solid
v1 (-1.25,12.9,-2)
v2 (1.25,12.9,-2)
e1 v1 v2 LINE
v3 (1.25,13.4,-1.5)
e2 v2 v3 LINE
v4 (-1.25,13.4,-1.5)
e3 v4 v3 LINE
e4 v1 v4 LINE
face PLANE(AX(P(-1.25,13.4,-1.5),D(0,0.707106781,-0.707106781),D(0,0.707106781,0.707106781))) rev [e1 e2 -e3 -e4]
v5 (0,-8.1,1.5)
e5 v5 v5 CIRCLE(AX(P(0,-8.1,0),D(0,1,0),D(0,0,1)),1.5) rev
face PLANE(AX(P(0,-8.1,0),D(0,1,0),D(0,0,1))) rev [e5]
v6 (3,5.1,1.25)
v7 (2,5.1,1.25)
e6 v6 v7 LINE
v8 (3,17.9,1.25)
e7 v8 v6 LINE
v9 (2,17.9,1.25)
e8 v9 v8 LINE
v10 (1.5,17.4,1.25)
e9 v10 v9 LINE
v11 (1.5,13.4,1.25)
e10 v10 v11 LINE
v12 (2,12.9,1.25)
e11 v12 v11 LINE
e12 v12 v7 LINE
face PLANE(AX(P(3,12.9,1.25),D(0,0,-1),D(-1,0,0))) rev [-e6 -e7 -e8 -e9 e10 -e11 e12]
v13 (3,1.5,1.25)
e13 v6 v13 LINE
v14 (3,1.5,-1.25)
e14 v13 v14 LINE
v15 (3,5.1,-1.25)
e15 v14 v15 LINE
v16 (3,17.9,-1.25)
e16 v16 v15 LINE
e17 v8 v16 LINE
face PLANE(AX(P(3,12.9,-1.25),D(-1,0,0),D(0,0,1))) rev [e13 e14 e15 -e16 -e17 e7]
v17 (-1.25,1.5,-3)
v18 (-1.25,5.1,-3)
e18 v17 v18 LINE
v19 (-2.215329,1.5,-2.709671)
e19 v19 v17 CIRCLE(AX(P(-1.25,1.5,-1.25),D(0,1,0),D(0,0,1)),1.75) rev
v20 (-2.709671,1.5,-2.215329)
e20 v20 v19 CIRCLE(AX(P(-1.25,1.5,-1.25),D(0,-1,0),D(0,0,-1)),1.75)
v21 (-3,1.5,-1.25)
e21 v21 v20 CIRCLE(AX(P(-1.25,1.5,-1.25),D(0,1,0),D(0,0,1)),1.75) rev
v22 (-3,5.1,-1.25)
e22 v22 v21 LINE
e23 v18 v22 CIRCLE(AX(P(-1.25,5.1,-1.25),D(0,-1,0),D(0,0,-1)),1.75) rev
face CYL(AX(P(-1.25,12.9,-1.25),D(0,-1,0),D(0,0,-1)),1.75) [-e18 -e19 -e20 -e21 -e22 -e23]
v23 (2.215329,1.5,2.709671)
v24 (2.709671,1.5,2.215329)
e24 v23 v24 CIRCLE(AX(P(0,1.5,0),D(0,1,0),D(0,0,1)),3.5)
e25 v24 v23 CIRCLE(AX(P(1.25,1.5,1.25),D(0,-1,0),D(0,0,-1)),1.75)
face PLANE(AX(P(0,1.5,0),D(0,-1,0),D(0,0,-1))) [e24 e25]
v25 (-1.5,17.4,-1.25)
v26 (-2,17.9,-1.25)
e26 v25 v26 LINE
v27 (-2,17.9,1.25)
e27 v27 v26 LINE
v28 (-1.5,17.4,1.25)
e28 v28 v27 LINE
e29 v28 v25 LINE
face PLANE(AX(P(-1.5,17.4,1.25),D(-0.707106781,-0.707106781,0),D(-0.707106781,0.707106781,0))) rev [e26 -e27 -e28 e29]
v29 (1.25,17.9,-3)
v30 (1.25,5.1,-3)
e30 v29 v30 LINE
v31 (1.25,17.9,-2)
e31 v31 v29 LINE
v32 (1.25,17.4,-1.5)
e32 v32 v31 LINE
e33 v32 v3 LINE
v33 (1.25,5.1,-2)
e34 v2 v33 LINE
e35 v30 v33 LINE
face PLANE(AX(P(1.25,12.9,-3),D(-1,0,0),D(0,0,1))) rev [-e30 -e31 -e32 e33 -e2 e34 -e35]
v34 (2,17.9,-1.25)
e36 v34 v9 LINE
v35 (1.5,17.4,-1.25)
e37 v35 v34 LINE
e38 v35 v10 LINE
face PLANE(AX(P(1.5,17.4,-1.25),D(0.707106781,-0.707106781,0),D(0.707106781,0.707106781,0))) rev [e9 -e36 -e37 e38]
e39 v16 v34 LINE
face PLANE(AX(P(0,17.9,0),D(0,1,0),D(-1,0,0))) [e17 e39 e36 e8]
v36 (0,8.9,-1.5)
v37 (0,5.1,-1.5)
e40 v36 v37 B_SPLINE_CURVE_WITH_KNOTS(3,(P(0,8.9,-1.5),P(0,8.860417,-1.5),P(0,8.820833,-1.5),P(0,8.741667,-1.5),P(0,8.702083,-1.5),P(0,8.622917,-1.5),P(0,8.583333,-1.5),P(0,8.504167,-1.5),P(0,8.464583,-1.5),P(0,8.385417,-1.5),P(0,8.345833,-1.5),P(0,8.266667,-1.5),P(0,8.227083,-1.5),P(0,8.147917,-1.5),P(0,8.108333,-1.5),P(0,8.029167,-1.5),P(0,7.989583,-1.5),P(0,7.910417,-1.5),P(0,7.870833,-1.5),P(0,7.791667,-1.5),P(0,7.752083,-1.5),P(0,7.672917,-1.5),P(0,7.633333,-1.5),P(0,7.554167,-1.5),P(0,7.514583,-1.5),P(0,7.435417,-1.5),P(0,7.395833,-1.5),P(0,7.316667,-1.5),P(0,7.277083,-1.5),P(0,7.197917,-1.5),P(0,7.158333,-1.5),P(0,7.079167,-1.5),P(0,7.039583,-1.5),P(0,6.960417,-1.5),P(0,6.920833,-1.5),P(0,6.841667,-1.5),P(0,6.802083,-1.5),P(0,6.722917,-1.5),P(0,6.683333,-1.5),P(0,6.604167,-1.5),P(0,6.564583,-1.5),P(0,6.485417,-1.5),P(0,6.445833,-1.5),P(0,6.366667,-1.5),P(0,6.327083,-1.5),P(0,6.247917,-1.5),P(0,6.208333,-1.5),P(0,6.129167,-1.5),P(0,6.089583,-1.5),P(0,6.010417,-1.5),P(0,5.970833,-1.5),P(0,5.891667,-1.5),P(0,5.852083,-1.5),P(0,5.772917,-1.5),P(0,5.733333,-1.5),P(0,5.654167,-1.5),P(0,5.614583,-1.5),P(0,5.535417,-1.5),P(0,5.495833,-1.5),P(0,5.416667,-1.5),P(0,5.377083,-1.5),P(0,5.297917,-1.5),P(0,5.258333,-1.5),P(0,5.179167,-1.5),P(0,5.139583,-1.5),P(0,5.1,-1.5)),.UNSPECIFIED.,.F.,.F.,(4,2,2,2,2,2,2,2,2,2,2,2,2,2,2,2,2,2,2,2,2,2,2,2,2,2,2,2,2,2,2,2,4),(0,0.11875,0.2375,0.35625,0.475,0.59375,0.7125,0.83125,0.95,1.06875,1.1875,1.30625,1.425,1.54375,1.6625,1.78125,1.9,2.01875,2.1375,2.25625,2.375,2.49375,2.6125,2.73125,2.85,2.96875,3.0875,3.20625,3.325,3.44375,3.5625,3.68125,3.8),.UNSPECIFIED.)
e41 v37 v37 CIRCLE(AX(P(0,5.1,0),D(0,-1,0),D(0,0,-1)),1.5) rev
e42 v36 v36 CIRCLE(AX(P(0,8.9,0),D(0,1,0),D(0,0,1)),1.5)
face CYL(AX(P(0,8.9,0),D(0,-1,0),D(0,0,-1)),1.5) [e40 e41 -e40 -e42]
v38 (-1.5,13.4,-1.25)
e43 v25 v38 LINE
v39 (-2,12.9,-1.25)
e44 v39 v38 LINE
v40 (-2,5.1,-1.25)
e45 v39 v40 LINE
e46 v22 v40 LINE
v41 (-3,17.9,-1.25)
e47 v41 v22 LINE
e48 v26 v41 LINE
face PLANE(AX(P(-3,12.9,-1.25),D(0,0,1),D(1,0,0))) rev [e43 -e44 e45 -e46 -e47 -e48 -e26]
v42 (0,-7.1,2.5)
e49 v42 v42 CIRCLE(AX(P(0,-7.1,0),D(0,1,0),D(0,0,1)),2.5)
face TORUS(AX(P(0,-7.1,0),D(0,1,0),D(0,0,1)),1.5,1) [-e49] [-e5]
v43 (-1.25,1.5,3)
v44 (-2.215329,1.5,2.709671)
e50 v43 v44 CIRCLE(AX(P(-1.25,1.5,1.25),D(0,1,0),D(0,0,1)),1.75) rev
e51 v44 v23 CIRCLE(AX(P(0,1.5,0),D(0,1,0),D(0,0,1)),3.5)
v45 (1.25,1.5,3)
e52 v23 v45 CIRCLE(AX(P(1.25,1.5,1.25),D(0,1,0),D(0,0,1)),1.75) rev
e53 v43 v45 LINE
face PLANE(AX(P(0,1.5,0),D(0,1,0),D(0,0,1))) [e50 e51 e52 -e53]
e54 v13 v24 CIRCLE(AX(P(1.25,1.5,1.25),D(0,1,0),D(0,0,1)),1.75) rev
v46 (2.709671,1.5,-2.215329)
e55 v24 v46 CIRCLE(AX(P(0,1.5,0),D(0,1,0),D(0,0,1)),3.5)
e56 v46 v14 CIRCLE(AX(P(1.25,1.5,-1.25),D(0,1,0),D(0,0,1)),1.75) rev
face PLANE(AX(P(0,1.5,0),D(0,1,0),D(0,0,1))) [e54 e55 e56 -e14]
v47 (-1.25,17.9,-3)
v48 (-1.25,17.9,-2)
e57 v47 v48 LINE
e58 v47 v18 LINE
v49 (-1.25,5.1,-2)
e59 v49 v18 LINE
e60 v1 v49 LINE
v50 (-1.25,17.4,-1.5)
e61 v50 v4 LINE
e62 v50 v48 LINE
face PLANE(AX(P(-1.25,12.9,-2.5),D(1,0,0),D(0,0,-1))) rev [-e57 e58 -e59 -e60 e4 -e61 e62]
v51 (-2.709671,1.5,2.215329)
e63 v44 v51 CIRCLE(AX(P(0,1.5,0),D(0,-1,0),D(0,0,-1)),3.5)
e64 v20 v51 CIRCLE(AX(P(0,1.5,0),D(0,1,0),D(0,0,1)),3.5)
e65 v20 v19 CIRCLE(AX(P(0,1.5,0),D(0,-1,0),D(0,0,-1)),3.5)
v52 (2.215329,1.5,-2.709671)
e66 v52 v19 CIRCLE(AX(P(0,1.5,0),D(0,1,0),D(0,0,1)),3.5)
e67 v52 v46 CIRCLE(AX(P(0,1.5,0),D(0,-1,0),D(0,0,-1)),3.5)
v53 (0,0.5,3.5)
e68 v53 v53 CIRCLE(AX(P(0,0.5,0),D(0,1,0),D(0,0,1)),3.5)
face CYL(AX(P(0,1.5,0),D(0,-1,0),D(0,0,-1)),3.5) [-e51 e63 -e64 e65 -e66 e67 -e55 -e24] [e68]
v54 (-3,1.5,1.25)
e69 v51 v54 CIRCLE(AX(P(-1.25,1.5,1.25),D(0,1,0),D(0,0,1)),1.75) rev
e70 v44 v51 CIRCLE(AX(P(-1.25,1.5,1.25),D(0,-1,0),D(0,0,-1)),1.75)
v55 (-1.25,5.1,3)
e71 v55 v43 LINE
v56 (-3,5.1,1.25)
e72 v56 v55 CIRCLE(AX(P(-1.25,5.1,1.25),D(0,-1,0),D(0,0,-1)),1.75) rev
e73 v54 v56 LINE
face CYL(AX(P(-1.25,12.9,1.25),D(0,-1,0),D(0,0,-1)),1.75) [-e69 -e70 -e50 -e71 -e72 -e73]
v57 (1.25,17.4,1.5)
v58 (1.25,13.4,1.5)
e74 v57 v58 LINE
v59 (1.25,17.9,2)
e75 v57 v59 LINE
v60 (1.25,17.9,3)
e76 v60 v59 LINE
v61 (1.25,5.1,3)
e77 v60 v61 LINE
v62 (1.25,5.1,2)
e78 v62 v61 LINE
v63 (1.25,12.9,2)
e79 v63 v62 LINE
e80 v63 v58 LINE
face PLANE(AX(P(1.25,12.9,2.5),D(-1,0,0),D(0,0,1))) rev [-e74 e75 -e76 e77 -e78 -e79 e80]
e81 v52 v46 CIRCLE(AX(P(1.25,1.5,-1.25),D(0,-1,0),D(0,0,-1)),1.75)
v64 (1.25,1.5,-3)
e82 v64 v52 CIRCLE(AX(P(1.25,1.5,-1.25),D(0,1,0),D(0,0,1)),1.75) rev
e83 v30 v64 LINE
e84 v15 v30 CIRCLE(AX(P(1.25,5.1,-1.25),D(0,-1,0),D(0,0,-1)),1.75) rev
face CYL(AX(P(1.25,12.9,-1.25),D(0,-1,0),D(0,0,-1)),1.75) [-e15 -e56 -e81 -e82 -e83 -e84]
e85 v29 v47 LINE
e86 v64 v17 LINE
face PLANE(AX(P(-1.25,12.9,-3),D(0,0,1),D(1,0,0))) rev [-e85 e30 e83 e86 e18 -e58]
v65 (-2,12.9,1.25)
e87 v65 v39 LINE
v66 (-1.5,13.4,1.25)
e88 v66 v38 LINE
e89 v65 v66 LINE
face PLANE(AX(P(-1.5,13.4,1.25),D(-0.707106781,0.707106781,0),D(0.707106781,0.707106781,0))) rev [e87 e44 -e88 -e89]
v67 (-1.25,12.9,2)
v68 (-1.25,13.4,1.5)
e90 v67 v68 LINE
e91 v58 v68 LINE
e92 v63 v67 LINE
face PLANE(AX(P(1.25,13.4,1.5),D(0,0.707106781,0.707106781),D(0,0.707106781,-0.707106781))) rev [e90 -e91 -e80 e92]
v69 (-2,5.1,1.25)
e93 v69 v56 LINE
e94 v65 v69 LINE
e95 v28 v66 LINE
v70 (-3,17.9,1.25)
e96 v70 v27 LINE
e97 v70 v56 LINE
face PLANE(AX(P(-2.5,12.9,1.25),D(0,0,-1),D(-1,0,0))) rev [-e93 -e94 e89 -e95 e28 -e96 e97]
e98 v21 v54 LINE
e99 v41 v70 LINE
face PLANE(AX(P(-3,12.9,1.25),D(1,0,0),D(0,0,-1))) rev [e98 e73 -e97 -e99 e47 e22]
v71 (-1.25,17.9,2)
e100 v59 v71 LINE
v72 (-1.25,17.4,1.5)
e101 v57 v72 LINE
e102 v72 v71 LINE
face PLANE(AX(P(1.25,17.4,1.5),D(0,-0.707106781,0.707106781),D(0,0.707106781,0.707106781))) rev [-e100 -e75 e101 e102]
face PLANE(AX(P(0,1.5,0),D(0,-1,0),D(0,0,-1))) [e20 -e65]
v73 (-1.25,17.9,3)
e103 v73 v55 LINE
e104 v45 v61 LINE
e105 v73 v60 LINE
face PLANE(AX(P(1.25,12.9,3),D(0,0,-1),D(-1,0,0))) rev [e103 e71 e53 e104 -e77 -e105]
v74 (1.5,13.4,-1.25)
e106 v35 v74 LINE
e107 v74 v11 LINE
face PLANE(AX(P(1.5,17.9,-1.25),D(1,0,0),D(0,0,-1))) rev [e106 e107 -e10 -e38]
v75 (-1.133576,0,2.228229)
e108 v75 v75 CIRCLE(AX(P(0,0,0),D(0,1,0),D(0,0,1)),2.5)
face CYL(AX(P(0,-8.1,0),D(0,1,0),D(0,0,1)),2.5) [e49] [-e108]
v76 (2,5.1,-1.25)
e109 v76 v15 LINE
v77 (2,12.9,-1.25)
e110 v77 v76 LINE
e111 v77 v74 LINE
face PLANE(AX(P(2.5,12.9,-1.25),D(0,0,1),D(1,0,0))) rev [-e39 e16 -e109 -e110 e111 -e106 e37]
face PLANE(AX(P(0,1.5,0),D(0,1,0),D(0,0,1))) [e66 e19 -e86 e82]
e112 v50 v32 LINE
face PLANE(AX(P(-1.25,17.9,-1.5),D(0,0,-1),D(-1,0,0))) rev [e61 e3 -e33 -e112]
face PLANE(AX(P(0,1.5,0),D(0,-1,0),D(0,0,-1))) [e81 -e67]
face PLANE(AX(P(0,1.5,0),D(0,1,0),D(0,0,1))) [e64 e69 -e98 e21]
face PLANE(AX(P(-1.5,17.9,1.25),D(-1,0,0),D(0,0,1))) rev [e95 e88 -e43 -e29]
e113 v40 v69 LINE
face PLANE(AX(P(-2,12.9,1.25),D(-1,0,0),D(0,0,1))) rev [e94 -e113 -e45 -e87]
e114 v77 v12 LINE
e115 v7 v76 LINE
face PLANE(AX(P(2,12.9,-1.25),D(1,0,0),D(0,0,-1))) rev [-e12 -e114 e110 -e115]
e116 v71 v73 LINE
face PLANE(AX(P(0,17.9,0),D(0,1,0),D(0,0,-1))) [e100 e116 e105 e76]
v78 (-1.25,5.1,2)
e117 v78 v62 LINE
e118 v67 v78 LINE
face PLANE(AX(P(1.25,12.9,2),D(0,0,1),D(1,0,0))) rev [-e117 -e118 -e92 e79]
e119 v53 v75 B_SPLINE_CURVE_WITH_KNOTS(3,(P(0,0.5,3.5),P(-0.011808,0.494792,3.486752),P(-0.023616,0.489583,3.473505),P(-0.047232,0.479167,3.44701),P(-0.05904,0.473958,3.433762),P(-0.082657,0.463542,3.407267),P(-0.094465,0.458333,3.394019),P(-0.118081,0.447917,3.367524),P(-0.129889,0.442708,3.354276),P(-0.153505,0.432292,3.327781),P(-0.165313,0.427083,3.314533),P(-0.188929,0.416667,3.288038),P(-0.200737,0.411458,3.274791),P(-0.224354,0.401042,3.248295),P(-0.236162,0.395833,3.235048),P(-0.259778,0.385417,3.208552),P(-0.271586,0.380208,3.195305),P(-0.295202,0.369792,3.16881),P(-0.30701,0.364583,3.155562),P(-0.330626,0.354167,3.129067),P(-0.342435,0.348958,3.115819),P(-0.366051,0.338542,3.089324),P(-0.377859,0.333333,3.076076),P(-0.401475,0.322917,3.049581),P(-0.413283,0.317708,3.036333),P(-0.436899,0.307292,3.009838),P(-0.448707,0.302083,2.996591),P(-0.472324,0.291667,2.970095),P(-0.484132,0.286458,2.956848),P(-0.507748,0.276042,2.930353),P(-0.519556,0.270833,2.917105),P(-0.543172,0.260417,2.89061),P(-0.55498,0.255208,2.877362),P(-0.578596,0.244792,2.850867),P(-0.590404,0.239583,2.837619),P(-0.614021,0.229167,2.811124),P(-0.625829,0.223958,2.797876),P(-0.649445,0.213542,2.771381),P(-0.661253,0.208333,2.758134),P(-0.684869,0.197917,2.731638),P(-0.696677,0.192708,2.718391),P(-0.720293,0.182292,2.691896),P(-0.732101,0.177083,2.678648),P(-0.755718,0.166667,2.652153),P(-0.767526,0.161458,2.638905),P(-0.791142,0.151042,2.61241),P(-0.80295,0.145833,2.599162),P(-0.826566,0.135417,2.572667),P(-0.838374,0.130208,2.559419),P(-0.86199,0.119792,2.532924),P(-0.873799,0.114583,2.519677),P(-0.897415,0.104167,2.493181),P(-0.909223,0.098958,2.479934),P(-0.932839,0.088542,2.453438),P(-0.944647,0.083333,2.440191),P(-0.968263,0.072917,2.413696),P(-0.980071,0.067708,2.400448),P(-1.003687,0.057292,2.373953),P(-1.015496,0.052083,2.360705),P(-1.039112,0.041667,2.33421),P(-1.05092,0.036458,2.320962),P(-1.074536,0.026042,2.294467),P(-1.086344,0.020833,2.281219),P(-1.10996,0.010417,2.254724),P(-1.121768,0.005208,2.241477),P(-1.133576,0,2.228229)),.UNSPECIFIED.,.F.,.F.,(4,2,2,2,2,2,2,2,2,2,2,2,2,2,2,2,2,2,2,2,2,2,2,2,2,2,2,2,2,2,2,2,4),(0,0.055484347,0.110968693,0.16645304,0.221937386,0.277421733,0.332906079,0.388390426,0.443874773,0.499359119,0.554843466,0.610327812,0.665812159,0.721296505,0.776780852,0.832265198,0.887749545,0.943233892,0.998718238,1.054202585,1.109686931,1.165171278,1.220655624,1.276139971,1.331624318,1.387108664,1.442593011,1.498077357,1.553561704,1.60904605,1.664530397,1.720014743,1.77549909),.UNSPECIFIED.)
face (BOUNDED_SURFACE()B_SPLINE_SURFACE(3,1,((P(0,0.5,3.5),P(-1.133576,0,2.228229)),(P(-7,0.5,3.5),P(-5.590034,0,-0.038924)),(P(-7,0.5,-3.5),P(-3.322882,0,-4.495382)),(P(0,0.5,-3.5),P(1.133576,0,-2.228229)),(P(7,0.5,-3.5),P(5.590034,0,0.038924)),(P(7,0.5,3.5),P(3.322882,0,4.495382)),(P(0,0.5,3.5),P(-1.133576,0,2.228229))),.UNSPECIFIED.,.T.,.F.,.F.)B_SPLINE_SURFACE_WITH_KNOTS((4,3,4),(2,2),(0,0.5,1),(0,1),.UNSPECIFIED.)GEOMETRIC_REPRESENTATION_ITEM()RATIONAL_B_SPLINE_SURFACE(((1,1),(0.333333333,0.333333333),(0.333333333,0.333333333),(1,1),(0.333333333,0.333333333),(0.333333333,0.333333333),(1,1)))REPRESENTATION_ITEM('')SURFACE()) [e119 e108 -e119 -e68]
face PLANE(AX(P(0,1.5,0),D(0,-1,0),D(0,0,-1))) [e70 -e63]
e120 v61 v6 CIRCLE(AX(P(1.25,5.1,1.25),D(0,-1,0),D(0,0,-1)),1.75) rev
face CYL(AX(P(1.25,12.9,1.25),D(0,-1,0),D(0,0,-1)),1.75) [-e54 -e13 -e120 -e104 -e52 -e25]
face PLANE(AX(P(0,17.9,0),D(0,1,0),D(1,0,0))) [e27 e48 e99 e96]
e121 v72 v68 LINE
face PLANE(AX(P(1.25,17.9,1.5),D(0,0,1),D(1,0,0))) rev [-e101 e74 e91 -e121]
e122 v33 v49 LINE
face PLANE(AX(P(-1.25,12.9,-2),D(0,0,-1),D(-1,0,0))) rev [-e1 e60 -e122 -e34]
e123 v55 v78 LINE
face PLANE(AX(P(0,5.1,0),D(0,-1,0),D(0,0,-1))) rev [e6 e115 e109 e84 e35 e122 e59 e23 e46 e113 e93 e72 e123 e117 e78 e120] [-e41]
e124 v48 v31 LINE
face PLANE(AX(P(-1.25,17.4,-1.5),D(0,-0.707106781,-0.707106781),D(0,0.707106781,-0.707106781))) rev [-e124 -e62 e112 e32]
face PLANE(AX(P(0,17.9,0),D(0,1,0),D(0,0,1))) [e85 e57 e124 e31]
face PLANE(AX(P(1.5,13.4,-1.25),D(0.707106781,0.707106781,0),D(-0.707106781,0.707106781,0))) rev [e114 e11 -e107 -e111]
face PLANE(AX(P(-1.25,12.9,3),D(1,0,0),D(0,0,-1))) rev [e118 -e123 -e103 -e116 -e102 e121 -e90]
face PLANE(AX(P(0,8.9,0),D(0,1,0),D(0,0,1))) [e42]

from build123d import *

# Parameters (mm, degrees)
SKETCH_1_R               = 2.5
EXTRUDE_1_DEPTH          = 8.1
SKETCH_4_R               = 3.5
EXTRUDE_2_DEPTH          = 1
EXTRUDE_3_DEPTH          = 11.4
SKETCH_6_W               = 2.5
SKETCH_6_H               = 1.5
EXTRUDE_4_DEPTH          = 5
CUT_EXTRUDE_2_DEPTH      = 2.5
CUT_EXTRUDE_3_DEPTH      = 2.5
PATTERN_CIRCULAR_4_COUNT = 4
EXTRUDE_6_DEPTH          = 3.6
SKETCH_15_R              = 1.5
EXTRUDE_7_DEPTH          = 3.8
FILLET_2_R               = 1
FILLET_3_R               = 1.75


with BuildPart() as part:
    # Эскиз1 → Бобышка-Вытянуть1 (new body)
    with BuildSketch(Plane(origin=(0, 0, 0), x_dir=(1, 0, 0), z_dir=(0, 1, 0))):
        with Locations(Location((0, 0, 0), (0, 0, 270))):
            Circle(SKETCH_1_R)
    extrude(amount=-EXTRUDE_1_DEPTH)

    # По сечениям1: read off the stored shape, not the designer's step
    # По сечениям1: loft between two sections, ruled curve by curve
    loft_1_from = [
        Edge.make_bspline([(0, 0.5, 3.5), (-7, 0.5, 3.5), (-7, 0.5, -3.5), (0, 0.5, -3.5), (7, 0.5, -3.5), (7, 0.5, 3.5), (0, 0.5, 3.5)], [0, 0, 0, 0, 0.5, 0.5, 0.5, 1, 1, 1, 1], 3, [1, 0.333333333, 0.333333333, 1, 0.333333333, 0.333333333, 1]),
    ]
    loft_1_to = [
        Edge.make_bspline([(-1.133576436, 0, 2.228228997), (-5.59003443, 0, -0.038923874), (-3.322881559, 0, -4.495381869), (1.133576436, 0, -2.228228997), (5.59003443, 0, 0.038923874), (3.322881559, 0, 4.495381869), (-1.133576436, 0, 2.228228997)], [0, 0, 0, 0, 0.5, 0.5, 0.5, 1, 1, 1, 1], 3, [1, 0.333333333, 0.333333333, 1, 0.333333333, 0.333333333, 1]),
    ]
    loft_1 = Solid(Shell([*[Face.make_surface_from_curves(loft_1_from[k], loft_1_to[k]) for k in range(1)], Face(Wire(loft_1_from)), Face(Wire(loft_1_to))]))
    add(loft_1)

    # Эскиз4 → Бобышка-Вытянуть2 (add)
    with BuildSketch(Plane(origin=(0, 0.5, 0), x_dir=(1, 0, 0), z_dir=(0, 1, 0))):
        with Locations(Location((0, 0, 0), (0, 0, 270))):
            Circle(SKETCH_4_R)
    extrude(amount=EXTRUDE_2_DEPTH)

    # Эскиз5 → Бобышка-Вытянуть3 (add)
    with BuildSketch(Plane(origin=(0, 1.5, 0), x_dir=(1, 0, 0), z_dir=(0, 1, 0))):
        Polygon((1.25, 2.5), (1.25, 2), (-1.25, 2), (-1.25, 2.5), (-1.25, 3), (1.25, 3), align=None)
    extrude_3 = extrude(amount=EXTRUDE_3_DEPTH)

    # Эскиз6 → Бобышка-Вытянуть4 (add)
    with BuildSketch(Plane(origin=(0, 12.9, 0), x_dir=(1, 0, 0), z_dir=(0, 1, 0))):
        with Locations((0, 2.25)):
            Rectangle(SKETCH_6_W, SKETCH_6_H)
    extrude_4 = extrude(amount=EXTRUDE_4_DEPTH)

    # Эскиз8 → Вырез-Вытянуть2 (cut)
    with BuildSketch(Plane(origin=(1.25, 0, 0), x_dir=(0, 0, -1), z_dir=(1, 0, 0))):
        Polygon((1.5, 12.9), (2, 12.9), (1.5, 13.4), align=None)
    cut_extrude_2 = extrude(amount=-CUT_EXTRUDE_2_DEPTH, mode=Mode.SUBTRACT)

    # Эскиз9 → Вырез-Вытянуть3 (cut)
    with BuildSketch(Plane(origin=(1.25, 0, 0), x_dir=(0, 0, -1), z_dir=(1, 0, 0))):
        Polygon((1.5, 17.9), (1.5, 17.4), (2, 17.9), align=None)
    cut_extrude_3 = extrude(amount=-CUT_EXTRUDE_3_DEPTH, mode=Mode.SUBTRACT)

    # Круговой массив4: Бобышка-Вытянуть3, Бобышка-Вытянуть4, Вырез-Вытянуть2, Вырез-Вытянуть3 ×4 about axis
    pattern_circular_4_axis = Axis((0, 0, 0), (0, 1, 0))
    add([extrude_3.rotate(pattern_circular_4_axis, i * 360 / PATTERN_CIRCULAR_4_COUNT) for i in range(1, PATTERN_CIRCULAR_4_COUNT)])
    add([extrude_4.rotate(pattern_circular_4_axis, i * 360 / PATTERN_CIRCULAR_4_COUNT) for i in range(1, PATTERN_CIRCULAR_4_COUNT)])
    add([cut_extrude_2.rotate(pattern_circular_4_axis, i * 360 / PATTERN_CIRCULAR_4_COUNT) for i in range(1, PATTERN_CIRCULAR_4_COUNT)], mode=Mode.SUBTRACT)
    add([cut_extrude_3.rotate(pattern_circular_4_axis, i * 360 / PATTERN_CIRCULAR_4_COUNT) for i in range(1, PATTERN_CIRCULAR_4_COUNT)], mode=Mode.SUBTRACT)

    # Эскиз14 → Бобышка-Вытянуть6 (add)
    with BuildSketch(Plane(origin=(0, 1.5, 0), x_dir=(1, 0, 0), z_dir=(0, 1, 0))):
        Polygon((0, 3), (3, 3), (3, -3), (-3, -3), (-3, 3), align=None)
    extrude(amount=EXTRUDE_6_DEPTH)

    # Эскиз15 → Бобышка-Вытянуть7 (add)
    with BuildSketch(Plane(origin=(0, 5.1, 0), x_dir=(1, 0, 0), z_dir=(0, 1, 0))):
        with Locations(Location((0, 0, 0), (0, 0, 90))):
            Circle(SKETCH_15_R)
    extrude(amount=EXTRUDE_7_DEPTH)

    # Скругление2
    fillet_2_edges = [part.edges().sort_by_distance(p)[0] for p in [
        (0, -8.1, -2.5),
    ]]
    fillet(fillet_2_edges, radius=FILLET_2_R)

    # Скругление3
    # the kernel refuses this fillet: 1.75 mm, written as the material it takes off along each edge
    with BuildSketch(Plane(origin=(-3, 1.5, -3), x_dir=(0, 0, 1), z_dir=(0, 1, 0)), Plane(origin=(3, 1.5, -3), x_dir=(-1, 0, 0), z_dir=(0, 1, 0)), Plane(origin=(-3, 1.5, 3), x_dir=(1, 0, 0), z_dir=(0, 1, 0))) as fillet_3_piece_1:
        with BuildLine():
            CenterArc((FILLET_3_R, FILLET_3_R), FILLET_3_R, 180, 90)
            Line((0, FILLET_3_R), (0, 0))
            Line((0, 0), (FILLET_3_R, 0))
        make_face()
    extrude(amount=7.975, mode=Mode.SUBTRACT)
    with BuildSketch(Plane(origin=(3, 1.5, 3), x_dir=(-1, 0, 0), z_dir=(0, 1, 0))) as fillet_3_piece_2:
        with BuildLine():
            CenterArc((FILLET_3_R, -FILLET_3_R), FILLET_3_R, 90, 90)
            Line((0, -FILLET_3_R), (0, 0))
            Line((0, 0), (FILLET_3_R, 0))
        make_face()
    extrude(amount=7.975, mode=Mode.SUBTRACT)


solid = part.part
